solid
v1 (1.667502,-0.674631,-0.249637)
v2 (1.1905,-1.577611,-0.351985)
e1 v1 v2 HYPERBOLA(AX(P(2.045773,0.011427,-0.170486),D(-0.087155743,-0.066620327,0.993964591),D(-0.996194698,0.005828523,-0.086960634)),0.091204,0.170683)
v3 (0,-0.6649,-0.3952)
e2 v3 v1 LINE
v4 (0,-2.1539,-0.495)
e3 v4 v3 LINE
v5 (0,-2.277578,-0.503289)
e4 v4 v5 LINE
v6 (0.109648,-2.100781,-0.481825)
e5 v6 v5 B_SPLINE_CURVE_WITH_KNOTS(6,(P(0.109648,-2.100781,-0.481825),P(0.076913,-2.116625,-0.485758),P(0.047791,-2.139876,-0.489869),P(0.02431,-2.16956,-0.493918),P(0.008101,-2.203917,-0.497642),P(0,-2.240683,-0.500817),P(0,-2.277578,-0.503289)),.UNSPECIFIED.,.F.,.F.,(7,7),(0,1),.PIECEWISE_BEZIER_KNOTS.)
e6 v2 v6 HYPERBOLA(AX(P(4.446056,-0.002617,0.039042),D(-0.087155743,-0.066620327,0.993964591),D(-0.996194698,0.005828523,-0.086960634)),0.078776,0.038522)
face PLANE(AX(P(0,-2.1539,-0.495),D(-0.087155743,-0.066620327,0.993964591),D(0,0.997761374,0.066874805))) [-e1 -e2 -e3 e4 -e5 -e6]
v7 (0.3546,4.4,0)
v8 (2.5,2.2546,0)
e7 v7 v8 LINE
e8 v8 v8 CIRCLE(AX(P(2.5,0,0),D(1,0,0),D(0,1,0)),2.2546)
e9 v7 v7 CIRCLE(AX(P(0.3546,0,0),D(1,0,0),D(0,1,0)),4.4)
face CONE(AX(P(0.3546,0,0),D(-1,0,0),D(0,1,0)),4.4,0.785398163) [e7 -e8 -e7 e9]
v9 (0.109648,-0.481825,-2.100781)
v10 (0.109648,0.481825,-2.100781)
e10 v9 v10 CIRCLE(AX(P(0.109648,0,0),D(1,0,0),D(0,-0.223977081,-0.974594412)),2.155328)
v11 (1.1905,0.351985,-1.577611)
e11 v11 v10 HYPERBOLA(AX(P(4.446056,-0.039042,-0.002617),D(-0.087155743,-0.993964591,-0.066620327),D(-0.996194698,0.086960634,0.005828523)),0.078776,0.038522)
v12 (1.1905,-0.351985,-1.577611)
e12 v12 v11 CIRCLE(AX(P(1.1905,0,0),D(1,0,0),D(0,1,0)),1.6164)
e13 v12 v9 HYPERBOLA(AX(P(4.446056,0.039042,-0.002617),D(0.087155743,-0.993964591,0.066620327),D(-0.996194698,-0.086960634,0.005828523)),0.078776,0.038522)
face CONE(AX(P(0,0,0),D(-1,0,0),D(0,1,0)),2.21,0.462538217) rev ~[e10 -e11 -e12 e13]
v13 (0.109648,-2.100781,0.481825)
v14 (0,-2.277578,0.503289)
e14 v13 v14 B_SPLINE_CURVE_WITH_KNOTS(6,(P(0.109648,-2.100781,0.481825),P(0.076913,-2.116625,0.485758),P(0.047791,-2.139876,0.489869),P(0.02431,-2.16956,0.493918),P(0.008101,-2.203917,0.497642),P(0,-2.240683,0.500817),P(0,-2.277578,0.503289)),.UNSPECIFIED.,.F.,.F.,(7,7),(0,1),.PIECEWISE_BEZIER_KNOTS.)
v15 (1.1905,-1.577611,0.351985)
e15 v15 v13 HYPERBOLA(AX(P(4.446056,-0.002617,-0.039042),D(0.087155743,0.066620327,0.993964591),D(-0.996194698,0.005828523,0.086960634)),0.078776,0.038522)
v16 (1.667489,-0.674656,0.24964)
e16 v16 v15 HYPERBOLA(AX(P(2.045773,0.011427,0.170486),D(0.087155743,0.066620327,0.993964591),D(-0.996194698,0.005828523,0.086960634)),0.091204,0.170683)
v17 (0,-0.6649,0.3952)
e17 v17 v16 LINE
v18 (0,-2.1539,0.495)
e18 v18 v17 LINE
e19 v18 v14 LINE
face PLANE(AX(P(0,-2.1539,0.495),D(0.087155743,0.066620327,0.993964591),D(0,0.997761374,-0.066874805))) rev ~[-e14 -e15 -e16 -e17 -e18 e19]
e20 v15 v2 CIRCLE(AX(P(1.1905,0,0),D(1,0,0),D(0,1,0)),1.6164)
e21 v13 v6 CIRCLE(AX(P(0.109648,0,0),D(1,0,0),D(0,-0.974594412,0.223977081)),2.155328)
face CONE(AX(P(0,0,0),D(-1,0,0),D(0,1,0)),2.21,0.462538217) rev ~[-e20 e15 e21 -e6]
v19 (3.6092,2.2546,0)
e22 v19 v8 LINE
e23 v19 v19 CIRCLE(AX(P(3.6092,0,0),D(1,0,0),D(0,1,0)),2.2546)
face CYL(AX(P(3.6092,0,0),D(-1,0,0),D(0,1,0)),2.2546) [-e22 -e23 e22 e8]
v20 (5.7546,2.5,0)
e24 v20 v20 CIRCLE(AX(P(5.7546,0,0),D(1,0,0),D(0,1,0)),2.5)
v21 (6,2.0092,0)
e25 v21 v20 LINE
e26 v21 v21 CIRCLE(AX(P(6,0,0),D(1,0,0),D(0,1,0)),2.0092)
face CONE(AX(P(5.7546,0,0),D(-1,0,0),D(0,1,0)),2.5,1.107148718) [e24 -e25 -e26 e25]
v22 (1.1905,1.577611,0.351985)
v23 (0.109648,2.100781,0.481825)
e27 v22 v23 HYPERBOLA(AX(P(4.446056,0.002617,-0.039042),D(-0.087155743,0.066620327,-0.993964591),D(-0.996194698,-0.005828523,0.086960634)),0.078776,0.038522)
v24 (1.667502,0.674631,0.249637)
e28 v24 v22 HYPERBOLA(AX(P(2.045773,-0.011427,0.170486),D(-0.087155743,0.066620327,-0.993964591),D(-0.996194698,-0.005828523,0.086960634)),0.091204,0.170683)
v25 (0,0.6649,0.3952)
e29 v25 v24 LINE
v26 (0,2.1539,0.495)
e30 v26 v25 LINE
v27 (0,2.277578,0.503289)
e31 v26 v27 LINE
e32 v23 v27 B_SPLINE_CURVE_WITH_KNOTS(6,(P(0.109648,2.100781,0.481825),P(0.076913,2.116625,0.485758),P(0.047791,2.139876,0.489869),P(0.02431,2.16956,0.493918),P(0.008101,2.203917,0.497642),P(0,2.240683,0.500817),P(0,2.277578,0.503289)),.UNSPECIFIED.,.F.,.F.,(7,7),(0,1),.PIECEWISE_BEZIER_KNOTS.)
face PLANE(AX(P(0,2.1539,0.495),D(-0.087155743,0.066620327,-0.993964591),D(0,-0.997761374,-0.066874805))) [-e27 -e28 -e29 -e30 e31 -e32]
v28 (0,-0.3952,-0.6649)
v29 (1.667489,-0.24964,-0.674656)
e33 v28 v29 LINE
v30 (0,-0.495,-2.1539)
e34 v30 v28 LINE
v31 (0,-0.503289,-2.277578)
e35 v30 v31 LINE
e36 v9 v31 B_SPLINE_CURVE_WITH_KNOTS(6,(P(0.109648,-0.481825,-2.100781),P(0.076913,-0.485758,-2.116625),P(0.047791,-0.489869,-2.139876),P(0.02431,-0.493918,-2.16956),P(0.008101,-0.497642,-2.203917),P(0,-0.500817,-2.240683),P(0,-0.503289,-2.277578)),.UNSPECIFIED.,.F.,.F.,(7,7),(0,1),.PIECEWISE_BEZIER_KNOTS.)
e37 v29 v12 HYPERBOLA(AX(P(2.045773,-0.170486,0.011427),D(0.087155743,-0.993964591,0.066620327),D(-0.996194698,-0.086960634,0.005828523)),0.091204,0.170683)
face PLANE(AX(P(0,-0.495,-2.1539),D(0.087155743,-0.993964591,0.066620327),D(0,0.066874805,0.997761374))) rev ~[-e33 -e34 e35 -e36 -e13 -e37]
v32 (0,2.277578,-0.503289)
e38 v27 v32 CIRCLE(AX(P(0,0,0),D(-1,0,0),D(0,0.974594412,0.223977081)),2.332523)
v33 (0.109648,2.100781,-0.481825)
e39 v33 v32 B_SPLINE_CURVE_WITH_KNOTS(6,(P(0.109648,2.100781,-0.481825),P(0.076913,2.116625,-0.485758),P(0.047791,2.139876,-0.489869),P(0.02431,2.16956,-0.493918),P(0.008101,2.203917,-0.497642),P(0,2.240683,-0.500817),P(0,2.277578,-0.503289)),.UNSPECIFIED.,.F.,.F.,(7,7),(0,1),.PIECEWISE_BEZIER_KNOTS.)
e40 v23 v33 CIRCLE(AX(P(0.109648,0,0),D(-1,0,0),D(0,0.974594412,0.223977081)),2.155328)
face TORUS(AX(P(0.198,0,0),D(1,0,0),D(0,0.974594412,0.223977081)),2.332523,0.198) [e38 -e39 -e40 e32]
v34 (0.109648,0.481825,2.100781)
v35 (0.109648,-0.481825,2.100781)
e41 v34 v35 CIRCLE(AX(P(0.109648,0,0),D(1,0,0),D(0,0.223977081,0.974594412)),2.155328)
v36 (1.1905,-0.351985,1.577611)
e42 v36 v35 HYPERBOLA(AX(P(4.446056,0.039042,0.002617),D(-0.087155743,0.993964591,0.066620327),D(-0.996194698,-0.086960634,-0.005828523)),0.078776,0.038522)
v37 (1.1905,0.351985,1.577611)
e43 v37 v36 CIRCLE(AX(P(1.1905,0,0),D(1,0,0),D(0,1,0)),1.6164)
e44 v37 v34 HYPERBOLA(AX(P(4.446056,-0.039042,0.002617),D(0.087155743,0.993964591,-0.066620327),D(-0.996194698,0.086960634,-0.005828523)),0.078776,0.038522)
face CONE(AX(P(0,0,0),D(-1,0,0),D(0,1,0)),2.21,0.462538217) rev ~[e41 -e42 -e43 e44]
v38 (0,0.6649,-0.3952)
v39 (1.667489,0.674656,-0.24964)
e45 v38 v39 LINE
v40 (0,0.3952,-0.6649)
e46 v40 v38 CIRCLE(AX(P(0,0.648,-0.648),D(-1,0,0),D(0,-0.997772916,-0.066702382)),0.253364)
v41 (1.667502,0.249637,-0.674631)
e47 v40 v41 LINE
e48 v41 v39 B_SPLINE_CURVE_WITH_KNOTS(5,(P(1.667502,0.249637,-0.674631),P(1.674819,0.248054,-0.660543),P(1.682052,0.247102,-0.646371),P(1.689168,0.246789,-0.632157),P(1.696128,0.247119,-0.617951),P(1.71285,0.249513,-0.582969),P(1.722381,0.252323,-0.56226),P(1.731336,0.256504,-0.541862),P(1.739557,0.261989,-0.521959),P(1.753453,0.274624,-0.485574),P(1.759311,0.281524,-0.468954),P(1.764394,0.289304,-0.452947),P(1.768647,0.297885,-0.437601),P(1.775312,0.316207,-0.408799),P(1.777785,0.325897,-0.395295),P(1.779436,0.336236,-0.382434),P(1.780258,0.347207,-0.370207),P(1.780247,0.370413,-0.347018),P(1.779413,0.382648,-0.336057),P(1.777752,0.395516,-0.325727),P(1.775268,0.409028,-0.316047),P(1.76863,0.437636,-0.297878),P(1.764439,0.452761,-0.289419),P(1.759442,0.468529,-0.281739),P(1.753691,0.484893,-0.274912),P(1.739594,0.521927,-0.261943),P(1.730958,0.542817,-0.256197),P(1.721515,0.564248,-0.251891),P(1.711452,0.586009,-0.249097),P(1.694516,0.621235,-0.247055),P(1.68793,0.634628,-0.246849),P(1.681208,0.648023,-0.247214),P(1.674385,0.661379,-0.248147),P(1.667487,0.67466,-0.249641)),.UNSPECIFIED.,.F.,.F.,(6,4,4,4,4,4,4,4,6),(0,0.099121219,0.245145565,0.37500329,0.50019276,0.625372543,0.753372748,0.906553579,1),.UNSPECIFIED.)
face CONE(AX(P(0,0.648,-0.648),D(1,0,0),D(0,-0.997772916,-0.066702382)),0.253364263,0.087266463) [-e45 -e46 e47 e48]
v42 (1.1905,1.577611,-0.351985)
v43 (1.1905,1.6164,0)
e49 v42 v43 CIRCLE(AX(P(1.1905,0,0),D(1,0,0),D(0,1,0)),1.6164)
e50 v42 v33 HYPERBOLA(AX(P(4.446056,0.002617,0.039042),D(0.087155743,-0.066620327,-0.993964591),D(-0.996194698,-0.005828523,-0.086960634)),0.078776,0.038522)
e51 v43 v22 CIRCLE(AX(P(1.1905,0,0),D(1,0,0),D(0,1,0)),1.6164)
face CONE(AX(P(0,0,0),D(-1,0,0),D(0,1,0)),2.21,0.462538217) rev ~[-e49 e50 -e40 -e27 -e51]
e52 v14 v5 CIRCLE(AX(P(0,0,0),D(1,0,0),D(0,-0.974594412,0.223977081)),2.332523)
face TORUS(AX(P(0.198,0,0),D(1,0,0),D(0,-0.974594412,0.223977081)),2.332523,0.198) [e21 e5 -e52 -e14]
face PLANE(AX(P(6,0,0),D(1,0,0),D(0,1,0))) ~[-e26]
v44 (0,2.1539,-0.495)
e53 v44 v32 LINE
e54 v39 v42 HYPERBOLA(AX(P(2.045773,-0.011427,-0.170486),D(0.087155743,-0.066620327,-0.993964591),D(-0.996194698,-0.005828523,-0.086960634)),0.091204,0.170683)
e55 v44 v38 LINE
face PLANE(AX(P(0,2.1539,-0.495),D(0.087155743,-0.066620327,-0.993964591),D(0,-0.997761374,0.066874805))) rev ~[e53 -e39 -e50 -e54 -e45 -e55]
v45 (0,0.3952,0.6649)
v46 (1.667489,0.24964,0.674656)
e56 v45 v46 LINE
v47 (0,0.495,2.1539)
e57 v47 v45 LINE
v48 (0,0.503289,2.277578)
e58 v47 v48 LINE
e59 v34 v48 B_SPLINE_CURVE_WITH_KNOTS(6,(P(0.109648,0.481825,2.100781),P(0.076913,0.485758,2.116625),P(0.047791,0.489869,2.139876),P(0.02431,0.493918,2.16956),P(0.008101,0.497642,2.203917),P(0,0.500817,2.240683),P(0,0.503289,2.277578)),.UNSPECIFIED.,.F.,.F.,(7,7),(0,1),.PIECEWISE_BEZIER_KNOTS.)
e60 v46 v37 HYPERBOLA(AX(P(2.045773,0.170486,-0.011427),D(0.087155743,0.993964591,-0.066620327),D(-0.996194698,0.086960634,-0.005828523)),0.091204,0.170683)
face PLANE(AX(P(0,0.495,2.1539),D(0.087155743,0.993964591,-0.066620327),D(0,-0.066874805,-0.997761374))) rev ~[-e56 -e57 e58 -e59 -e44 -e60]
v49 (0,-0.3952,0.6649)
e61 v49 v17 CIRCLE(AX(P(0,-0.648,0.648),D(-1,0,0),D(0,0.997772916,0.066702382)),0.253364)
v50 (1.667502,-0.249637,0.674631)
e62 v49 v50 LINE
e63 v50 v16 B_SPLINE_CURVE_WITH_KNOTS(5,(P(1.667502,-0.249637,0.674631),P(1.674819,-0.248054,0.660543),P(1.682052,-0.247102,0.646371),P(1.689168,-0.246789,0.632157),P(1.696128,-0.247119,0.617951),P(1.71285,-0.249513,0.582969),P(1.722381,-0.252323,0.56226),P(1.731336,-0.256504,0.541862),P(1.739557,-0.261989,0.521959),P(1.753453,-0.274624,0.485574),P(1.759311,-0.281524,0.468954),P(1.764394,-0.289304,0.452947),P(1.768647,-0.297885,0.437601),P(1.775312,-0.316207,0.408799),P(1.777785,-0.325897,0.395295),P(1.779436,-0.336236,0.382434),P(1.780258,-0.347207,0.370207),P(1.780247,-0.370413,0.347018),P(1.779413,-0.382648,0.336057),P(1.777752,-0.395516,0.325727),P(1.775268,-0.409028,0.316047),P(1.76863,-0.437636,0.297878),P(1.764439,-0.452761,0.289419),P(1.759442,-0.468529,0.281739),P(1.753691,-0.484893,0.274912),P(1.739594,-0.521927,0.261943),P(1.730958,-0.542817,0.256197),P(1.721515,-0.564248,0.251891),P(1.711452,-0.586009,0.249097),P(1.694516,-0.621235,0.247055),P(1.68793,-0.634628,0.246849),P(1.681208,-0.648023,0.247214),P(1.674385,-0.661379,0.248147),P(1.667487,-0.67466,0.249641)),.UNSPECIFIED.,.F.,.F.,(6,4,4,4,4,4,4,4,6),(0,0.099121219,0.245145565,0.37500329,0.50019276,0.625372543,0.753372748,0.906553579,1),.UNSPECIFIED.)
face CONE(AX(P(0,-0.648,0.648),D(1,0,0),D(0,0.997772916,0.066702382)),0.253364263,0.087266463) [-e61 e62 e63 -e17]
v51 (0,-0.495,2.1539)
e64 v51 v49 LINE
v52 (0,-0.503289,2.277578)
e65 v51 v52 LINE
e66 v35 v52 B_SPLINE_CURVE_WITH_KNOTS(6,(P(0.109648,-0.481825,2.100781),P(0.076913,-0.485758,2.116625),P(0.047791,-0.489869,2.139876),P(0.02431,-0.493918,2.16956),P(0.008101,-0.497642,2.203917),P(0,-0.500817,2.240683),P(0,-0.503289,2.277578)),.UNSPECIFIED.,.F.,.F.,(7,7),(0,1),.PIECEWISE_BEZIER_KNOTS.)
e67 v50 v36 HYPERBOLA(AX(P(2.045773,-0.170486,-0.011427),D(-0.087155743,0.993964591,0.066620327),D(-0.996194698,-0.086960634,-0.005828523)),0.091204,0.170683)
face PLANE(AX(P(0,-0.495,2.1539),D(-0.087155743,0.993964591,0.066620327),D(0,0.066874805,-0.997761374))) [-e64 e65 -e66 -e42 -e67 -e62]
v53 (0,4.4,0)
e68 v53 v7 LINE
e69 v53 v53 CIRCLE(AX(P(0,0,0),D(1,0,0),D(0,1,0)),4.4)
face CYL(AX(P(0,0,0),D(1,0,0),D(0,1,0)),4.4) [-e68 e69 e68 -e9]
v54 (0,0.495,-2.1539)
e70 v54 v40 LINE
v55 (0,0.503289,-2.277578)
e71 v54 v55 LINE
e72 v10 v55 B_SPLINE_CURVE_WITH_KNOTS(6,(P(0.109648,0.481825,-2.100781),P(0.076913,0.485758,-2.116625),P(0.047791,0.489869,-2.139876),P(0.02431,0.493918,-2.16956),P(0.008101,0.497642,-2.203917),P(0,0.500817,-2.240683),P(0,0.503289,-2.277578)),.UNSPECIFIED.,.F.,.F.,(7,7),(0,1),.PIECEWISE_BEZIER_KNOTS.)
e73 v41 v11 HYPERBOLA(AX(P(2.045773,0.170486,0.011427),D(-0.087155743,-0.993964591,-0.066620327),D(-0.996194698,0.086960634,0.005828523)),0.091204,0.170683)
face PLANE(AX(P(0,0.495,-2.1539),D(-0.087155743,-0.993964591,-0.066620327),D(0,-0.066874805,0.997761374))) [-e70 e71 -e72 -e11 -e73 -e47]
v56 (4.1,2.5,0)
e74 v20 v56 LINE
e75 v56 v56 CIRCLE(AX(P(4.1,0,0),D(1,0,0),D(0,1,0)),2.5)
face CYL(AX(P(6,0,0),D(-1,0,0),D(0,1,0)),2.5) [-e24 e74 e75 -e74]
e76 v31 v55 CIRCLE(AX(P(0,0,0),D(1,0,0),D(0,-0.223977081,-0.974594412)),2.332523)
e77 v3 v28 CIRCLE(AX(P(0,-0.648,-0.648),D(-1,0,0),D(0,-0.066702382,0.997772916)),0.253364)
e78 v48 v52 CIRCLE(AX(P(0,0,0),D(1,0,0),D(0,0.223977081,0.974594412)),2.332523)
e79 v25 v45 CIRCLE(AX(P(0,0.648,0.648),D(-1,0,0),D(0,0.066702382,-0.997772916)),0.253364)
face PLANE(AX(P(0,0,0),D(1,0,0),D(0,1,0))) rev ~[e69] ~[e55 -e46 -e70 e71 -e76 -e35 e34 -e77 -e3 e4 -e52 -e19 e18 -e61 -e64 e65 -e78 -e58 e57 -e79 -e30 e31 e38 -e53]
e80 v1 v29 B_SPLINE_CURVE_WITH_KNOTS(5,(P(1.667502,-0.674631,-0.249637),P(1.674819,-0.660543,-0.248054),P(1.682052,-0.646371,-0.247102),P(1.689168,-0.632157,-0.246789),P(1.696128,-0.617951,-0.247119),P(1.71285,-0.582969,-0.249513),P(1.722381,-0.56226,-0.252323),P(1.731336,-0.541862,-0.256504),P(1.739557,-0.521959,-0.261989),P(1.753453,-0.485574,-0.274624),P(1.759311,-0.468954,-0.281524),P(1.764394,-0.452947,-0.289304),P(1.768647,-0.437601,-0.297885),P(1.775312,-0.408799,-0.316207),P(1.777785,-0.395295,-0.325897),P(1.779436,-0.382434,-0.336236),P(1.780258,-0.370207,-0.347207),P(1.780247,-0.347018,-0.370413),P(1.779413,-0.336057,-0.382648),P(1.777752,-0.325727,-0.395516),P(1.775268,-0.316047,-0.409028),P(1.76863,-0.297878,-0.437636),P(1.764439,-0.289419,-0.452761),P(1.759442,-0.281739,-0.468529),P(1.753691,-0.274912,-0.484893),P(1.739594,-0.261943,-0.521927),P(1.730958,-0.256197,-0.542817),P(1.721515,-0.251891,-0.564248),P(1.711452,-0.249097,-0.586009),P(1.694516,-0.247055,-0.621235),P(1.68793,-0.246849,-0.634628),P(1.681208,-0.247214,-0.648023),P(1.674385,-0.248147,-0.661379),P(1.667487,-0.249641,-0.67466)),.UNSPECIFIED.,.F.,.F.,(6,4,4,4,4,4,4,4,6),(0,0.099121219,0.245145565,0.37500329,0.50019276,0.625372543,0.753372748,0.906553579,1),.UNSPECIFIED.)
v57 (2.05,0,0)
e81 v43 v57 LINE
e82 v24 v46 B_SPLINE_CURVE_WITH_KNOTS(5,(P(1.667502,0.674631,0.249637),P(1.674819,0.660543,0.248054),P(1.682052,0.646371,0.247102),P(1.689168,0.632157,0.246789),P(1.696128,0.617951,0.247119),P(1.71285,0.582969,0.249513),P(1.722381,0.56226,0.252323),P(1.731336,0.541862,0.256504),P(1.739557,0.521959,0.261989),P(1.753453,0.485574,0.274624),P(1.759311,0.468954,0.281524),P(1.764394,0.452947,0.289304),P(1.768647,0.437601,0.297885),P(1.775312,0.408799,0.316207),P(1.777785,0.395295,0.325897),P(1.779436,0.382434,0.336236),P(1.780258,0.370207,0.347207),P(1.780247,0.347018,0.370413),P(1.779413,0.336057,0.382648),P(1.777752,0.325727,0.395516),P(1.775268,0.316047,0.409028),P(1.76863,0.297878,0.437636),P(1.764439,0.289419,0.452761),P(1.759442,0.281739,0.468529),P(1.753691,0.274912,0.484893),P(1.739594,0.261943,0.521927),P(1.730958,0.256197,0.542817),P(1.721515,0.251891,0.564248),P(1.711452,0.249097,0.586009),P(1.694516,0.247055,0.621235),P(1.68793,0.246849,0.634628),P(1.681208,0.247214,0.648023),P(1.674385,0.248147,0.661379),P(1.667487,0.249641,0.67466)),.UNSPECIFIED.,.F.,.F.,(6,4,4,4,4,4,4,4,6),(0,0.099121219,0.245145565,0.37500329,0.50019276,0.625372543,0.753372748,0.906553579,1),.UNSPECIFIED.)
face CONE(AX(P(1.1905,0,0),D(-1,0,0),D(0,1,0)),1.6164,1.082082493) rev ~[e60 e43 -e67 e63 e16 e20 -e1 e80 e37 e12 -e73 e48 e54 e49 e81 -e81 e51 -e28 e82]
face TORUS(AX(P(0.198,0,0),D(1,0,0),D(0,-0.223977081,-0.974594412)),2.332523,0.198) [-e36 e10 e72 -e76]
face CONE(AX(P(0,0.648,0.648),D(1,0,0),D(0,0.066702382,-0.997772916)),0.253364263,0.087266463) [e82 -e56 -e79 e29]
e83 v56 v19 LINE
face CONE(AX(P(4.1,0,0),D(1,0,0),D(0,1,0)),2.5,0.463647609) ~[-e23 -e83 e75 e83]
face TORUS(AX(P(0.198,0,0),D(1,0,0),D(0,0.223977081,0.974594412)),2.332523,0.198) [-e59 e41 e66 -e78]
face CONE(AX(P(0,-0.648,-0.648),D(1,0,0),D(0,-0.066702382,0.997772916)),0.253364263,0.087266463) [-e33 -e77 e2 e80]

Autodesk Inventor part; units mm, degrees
ref_plane "YZ Plane" through (0, 0, 0) normal (1, 0, 0) x (0, 1, 0)
ref_plane "XZ Plane" through (0, 0, 0) normal (0, 1, 0) x (-1, 0, 0)
sketch "Sketch1" plane through (0, 0, 0) normal (0, 0, 1) x (1, 0, 0)
  line L0 (2.05, 0) -> (6, 0)
  line L1 (6, 0) -> (6, 2.5)
  line L2 (6, 2.5) -> (4.1, 2.5)
  line L3 (4.1, 2.5) -> (3.6092, 2.2546)
  line L4 (3.6092, 2.2546) -> (2.5, 2.2546)
  line L5 (0, 4.4) -> (0, 2.21)
  line L6 (0, 2.21) -> (1.1905, 1.6164)
  line L7 (1.1905, 1.6164) -> (2.05, 0)
  line L8 (-1.2, 0) -> (7.2, 0) projected
  line L9 (0, -0.88) -> (0, 5.28) projected
  line L10 (0, 4.4) -> (0.3546, 4.4)
  line L11 (0.3546, 4.4) -> (2.5, 2.2546)
  line L12 (4.1, 2.5) -> (2.2546, 2.5) construction
  dimension "d1" = 1.9
  dimension "d2" = 5
  dimension "d3" = 4.5092
  dimension "d4" = 4.42
  dimension "d5" = 26.5
  dimension "d6" = 62
  dimension "d7" = 2.05
  dimension "d8" = 0.4908
  dimension "d12" = 8.8
  dimension "d13" = 45
  dimension "d15" = 6
  dimension "d24" = 2.5
revolve "Body" add sketch "Sketch1" angle 360 about axis through (2.05, 0, 0) along (1, 0, 0) contours L7 L6 L5 L10 L11 L4 L3 L2 L1 L0
sketch "Sketch2" plane through (0, 0, 0) normal (-1, 0, 0) x (0, 0, 1)
  line L0 (0, 2.21) -> (0, 0) construction
  line L1 (0, 0) -> (2.21, 0) construction
  arc A0 (0.663, 0) -> (0, 0.663) centre (0, 0) ccw construction
  arc A1 (0.7735, 0) -> (0, 0.7735) centre (0, 0) ccw construction
  arc A2 (2.1539, 0.495) -> (0.495, 2.1539) centre (0, 0) ccw
  line L2 (0, 0) -> (1.5627, 1.5627) construction
  line L3 (0.495, 2.1539) -> (0.3952, 0.6649)
  line L4 (2.1539, 0.495) -> (0.6649, 0.3952)
  arc A3 (0.495, 2.1539) -> (0, 2.21) centre (0, 0) ccw
  arc A4 (2.21, 0) -> (2.1539, 0.495) centre (0, 0) ccw
  line L5 (0, -6.16) -> (0, 6.16) projected
  line L6 (-6.16, 0) -> (6.16, 0) projected
  arc A5 (0.495, -2.1539) -> (2.1539, -0.495) centre (0, 0) ccw
  line L7 (0.495, -2.1539) -> (0.3952, -0.6649)
  line L8 (2.1539, -0.495) -> (0.6649, -0.3952)
  arc A6 (0, -2.21) -> (0.495, -2.1539) centre (0, 0) ccw
  arc A7 (2.1539, -0.495) -> (2.21, 0) centre (0, 0) ccw
  arc A8 (-0.495, 2.1539) -> (-2.1539, 0.495) centre (0, 0) ccw
  line L9 (-0.495, 2.1539) -> (-0.3952, 0.6649)
  line L10 (-2.1539, 0.495) -> (-0.6649, 0.3952)
  arc A9 (0, 2.21) -> (-0.495, 2.1539) centre (0, 0) ccw
  arc A10 (-2.1539, 0.495) -> (-2.21, 0) centre (0, 0) ccw
  arc A11 (-0.495, -2.1539) -> (0, -2.21) centre (0, 0) ccw
  arc A12 (-2.1539, -0.495) -> (-0.495, -2.1539) centre (0, 0) ccw
  arc A13 (-2.21, 0) -> (-2.1539, -0.495) centre (0, 0) ccw
  line L11 (-2.1539, -0.495) -> (-0.6649, -0.3952)
  line L12 (-0.495, -2.1539) -> (-0.3952, -0.6649)
  arc A14 (0.3952, 0.6649) -> (0.6649, 0.3952) centre (0.648, 0.648) ccw
  arc A15 (0.6649, -0.3952) -> (0.3952, -0.6649) centre (0.648, -0.648) ccw
  arc A16 (-0.6649, 0.3952) -> (-0.3952, 0.6649) centre (-0.648, 0.648) ccw
  arc A17 (-0.3952, -0.6649) -> (-0.6649, -0.3952) centre (-0.648, -0.648) ccw
  point P0 (1.5627, -1.5627)
  point P1 (-1.5627, 1.5627)
  point P2 (-1.5627, -1.5627)
  dimension "d17" = 1.326
  dimension "d18" = 1.547
  dimension "d19" = 4.42
  dimension "d20" = 45
  dimension "d21" = 0.495
extrude "Slot" add sketch "Sketch2" against normal up to next draft 5 contours L4 A14 L3 A2 | A5 L7 A15 L8 | L9 A16 L10 A8 | A12 L11 A17 L12
fillet "Fillet1" radius 0.198 4 edges at (0, 2.21, 0) (0, 0, -2.21) (0, -2.21, 0) (0, 0, 2.21)
thread "Thread" size "M5x0.8" class "6g" standard "ISO Metric profile" length 1.9
chamfer "Chamfer1" distance 0.4908 distance2 0.2454 1 edges at (6, -2.5, 0) measured on face at (6, 0.6238, 0.5526)
ref_plane "Work Plane2" through (3.35, 0, 0) normal (0, 0, -1) x (1, 0, 0)
equation "\"d1\" = GEL"
equation "\"d2\" = GD"
equation "\"d3\" = BDM"
equation "\"d4\" = SDM"
equation "\"d7\" = INTI"
equation "\"d8\" = GAL"
equation "\"d12\" = KOD"
equation "\"d13\" = 0.5 * SEWI"
equation "\"d15\" = NLG"
equation "\"d24\" = KOH"
equation "\"d17\" = 0.3 * SDM"
equation "\"d18\" = 0.35 * SDM"
equation "\"d19\" = SDM"
equation "\"d21\" = 0.5 * SBR"
equation "\"d23\" = 0.2 * SBR"
equation "\"d10\" = GEL"
equation "\"d25\" = -0.5 * SPD + 0.5 * GD"
equation "\"d26\" = 0.5 * GAL"
equation "\"NLG\" = 6"
equation "\"GEL\" = 1.9"
equation "\"GAL\" = 0.61345 * PTC"
equation "\"SPD\" = NND - 1.2269 * PTC"
equation "\"KOD\" = 8.8"
equation "\"KOH\" = 2.5"
equation "\"SBR\" = 0.99"
equation "\"INTI\" = 2.05"
equation "\"SDM\" = 4.42"
equation "\"GD\" = NND"
equation "\"BDM\" = NND - GAL"
equation "\"SEWI\" = 90deg"
equation "\"d9\" = SDM"
equation "\"GUL\" = 0.61345 * PTC"
equation "\"TOA\" = 30deg"
equation "\"EPV\" = 5"
equation "\"THREADDIA\" = 5"
equation "\"RR\" = 0.5"
equation "\"PTC\" = 0.8"
equation "\"NND\" = 5"
equation "\"GD1\" = THREADDIA - 1.2269 * PTC"
properties part number "AS 1427 - M5 x 6" material "Steel, Mild"
